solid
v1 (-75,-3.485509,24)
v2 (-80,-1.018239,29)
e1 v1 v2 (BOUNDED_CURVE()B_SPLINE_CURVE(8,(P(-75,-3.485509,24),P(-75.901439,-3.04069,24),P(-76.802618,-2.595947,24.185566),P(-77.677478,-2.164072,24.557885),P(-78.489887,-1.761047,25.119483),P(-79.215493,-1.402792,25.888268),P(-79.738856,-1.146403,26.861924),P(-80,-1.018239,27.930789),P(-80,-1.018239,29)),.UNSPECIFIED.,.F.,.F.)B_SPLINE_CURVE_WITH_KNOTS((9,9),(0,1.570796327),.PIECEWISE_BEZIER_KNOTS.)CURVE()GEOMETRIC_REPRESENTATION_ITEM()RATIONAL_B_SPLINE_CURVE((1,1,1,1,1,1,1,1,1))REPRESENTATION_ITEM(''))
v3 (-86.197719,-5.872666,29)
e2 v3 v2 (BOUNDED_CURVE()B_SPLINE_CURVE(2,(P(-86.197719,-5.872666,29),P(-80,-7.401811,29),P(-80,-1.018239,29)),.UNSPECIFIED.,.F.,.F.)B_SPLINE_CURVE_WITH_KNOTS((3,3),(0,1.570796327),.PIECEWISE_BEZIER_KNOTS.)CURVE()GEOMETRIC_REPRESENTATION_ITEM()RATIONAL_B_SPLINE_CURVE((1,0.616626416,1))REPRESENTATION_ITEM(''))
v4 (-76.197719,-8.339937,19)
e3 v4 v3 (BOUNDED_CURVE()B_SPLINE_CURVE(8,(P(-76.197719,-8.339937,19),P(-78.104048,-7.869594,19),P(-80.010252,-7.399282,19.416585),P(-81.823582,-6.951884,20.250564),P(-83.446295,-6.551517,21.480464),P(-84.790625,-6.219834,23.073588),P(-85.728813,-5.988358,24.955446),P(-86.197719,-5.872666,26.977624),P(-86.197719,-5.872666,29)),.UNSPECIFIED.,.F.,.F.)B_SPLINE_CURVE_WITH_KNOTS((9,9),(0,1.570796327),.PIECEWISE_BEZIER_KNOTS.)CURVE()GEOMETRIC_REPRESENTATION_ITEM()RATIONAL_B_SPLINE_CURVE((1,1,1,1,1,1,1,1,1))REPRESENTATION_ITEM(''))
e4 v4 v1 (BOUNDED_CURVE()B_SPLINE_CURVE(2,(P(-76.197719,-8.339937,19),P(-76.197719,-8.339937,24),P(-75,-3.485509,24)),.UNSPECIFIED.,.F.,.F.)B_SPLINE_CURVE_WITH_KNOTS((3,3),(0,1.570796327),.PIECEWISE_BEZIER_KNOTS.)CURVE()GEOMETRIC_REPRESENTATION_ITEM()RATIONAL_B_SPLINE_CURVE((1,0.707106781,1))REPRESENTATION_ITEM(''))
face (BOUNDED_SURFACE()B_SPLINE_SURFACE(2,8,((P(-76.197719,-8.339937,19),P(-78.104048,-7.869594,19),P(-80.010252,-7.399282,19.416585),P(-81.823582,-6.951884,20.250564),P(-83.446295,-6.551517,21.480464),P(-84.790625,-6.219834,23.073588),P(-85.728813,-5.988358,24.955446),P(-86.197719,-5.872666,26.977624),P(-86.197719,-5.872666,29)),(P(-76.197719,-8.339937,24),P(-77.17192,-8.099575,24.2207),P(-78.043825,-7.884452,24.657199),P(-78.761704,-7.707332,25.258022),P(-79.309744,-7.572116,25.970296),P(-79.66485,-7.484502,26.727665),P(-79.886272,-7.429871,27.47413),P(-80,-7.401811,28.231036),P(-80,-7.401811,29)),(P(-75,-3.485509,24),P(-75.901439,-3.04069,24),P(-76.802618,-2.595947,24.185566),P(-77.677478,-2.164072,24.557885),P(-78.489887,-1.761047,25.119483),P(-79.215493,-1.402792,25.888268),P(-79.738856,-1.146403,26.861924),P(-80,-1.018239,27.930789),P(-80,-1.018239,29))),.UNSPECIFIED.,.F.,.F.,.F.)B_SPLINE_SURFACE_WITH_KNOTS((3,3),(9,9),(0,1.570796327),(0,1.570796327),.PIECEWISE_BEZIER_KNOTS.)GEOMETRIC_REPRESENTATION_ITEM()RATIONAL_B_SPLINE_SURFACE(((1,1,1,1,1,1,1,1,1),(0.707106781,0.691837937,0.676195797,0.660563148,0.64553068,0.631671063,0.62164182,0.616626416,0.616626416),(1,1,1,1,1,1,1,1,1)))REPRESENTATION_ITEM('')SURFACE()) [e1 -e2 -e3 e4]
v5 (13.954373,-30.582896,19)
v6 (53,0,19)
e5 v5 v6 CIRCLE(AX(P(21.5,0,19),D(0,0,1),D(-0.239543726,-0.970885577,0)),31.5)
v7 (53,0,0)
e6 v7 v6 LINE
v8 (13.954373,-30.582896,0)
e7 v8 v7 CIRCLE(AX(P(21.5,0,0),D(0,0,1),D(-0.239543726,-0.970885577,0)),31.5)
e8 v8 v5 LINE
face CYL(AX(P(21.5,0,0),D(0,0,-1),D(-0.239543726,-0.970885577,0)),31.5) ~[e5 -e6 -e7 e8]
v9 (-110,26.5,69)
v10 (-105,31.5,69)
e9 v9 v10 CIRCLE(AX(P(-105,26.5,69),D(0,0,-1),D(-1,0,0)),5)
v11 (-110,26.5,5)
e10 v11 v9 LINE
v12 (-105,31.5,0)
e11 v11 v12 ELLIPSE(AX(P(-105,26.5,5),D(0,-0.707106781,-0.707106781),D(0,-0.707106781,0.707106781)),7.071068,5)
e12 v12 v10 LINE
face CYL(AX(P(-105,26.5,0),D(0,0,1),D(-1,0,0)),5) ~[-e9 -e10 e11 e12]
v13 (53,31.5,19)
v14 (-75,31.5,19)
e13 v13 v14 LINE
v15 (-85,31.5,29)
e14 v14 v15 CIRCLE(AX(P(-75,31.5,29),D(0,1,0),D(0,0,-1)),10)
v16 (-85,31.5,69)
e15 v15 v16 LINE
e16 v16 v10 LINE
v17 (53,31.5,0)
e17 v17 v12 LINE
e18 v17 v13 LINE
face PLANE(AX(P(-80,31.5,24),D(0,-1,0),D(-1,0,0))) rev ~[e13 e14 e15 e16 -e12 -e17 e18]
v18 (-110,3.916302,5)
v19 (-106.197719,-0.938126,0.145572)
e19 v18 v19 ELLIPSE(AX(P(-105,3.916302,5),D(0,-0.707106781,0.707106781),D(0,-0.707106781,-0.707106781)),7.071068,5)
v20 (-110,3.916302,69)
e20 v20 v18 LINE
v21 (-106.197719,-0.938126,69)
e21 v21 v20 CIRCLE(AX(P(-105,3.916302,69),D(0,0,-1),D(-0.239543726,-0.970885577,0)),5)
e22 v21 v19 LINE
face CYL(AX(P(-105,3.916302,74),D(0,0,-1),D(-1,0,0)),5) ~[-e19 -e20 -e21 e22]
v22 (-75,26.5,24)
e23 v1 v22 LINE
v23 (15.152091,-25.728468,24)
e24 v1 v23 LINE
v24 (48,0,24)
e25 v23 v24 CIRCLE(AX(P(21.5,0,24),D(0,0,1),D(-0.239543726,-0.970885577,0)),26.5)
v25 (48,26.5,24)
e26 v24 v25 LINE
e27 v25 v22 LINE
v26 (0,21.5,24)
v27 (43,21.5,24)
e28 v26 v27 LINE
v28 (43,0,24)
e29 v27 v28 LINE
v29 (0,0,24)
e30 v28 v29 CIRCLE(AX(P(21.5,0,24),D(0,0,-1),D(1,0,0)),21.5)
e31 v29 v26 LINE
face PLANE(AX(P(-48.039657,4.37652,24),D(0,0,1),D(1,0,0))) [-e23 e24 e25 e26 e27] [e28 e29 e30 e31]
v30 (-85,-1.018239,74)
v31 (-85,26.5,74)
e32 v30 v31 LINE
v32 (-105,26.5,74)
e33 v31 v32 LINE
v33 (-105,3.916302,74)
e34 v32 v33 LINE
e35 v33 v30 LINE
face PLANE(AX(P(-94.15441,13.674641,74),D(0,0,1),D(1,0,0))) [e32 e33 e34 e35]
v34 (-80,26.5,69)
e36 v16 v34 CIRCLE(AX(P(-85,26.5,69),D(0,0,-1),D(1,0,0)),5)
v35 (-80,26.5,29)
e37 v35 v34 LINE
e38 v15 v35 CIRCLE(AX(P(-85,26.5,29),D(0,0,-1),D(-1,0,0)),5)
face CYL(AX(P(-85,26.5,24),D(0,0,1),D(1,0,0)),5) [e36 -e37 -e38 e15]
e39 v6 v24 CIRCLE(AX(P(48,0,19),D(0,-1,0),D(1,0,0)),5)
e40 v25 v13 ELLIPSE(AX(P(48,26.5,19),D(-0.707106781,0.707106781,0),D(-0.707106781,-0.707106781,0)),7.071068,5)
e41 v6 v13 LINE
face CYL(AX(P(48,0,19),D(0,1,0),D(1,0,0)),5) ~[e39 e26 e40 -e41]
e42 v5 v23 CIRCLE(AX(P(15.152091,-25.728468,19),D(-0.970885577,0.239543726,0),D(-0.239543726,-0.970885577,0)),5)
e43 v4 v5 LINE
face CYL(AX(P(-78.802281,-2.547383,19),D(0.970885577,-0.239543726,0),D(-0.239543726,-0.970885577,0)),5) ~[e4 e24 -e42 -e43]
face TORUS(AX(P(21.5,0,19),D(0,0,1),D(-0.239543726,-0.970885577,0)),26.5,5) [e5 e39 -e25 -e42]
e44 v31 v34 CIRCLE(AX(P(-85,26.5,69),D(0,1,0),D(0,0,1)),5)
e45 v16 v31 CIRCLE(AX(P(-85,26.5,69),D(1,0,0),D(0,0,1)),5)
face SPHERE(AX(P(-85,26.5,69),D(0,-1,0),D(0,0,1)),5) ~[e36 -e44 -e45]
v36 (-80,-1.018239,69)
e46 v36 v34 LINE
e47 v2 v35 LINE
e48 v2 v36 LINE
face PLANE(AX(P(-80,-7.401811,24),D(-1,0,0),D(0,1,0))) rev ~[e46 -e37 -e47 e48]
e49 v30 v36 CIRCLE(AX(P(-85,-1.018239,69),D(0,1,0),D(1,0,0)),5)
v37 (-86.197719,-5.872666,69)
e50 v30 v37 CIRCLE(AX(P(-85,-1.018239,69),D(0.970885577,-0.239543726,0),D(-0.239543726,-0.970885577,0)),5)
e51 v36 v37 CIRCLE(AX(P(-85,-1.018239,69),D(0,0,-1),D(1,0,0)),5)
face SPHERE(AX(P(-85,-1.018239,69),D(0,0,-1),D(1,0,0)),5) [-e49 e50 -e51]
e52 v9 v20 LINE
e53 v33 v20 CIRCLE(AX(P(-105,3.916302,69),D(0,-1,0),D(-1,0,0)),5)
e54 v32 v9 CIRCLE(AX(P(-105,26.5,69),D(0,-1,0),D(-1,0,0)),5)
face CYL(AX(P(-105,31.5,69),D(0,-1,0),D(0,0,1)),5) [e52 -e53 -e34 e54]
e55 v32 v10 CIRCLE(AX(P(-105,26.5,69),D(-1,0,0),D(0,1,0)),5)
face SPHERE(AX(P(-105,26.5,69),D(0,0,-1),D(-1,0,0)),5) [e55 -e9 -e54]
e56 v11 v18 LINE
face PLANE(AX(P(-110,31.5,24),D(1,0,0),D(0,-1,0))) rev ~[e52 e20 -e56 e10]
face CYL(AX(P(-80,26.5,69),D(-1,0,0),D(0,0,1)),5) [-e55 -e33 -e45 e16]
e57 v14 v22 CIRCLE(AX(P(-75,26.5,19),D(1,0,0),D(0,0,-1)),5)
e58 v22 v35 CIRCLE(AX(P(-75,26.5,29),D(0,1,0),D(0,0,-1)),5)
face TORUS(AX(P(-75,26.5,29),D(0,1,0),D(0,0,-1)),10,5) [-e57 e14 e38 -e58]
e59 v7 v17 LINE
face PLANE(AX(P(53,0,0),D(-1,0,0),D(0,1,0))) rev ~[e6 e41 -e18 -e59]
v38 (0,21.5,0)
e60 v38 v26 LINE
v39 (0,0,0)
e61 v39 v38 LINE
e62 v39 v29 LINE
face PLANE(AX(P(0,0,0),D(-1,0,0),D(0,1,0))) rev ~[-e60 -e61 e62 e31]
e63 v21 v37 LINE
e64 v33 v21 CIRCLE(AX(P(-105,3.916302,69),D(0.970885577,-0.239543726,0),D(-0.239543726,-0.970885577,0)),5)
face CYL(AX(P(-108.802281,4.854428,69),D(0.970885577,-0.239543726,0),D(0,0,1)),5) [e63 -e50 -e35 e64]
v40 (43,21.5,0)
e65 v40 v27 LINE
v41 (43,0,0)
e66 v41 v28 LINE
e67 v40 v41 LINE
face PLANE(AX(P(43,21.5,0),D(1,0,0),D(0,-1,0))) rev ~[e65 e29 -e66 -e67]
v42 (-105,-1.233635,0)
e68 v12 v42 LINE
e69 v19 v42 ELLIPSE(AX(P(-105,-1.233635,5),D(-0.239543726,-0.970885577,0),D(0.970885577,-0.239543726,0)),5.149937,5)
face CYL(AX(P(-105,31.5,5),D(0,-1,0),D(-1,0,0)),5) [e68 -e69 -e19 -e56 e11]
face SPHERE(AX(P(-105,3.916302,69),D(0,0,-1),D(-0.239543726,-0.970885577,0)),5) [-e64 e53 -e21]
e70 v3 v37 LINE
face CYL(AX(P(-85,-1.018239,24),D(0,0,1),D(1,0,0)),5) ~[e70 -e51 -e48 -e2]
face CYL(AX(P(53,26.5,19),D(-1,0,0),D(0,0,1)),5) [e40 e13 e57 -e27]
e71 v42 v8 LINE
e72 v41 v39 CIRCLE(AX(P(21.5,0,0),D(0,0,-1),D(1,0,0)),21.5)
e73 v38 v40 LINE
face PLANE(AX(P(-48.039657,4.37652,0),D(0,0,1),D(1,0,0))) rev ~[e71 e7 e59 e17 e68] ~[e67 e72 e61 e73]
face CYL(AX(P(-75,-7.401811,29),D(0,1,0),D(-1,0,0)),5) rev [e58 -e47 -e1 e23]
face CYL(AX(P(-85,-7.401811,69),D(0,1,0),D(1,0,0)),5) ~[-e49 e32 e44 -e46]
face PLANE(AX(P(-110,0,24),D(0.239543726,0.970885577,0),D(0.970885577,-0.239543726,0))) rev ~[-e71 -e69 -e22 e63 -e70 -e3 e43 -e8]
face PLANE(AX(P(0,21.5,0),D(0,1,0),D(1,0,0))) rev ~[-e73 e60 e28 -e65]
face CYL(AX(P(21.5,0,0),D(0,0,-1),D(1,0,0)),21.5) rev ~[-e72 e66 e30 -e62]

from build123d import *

# Parameters (mm, degrees)
F1_DEPTH = 24
F3_DEPTH = 50
F4_R     = 5


with BuildPart() as f1:
    # F0 (on Top) → F1 (new body)
    with BuildSketch(Plane.XY):
        with BuildLine():
            Line((-10, 0), (-10, 31.5))
            Line((-10, 31.5), (-110, 31.5))
            Line((-110, 31.5), (-110, 0))
            Line((-110, 0), (13.9543726236, -30.5828956689))
            ThreePointArc((13.9543726236, -30.5828956689), (-3.2985610707, -19.4237321033), (-10, 0))
        make_face()
        with BuildLine():
            Line((53, 31.5), (-10, 31.5))
            Line((-10, 31.5), (-10, 0))
            ThreePointArc((-10, 0), (-3.2985610707, -19.4237321033), (13.9543726236, -30.5828956689))
            ThreePointArc((13.9543726236, -30.5828956689), (40.9237321033, -24.7985610707), (53, 0))
            Line((53, 0), (53, 31.5))
        make_face()
        with BuildLine():
            ThreePointArc((43, 0), (21.5, -21.5), (0, 0))
            Line((0, 0), (0, 21.5))
            Line((0, 21.5), (43, 21.5))
            Line((43, 21.5), (43, 0))
        make_face(mode=Mode.SUBTRACT)
    extrude(amount=F1_DEPTH)

    # F2 (on face) → F3 (join)
    with BuildSketch(Plane.XY.offset(24)):
        Polygon((-80, -7.4018112524), (-80, 31.5), (-110, 31.5), (-110, 0), align=None)
    extrude(amount=F3_DEPTH)

    # F4
    f4_edges = [f1.edges().sort_by_distance(p)[0] for p in [
        (-110, 31.5, 37),
        (-110, 15.75, 74),
        (-110, 0, 37),
        (-110, 15.75, 0),
        (-80, 12.049094, 74),
        (-95, 31.5, 74),
        (-95, -3.700906, 74),
        (-80, -7.401811, 49),
        (-80, 31.5, 49),
        (-80, 12.049094, 24),
        (-13.5, 31.5, 24),
        (53, 15.75, 24),
        (40.923732, -24.798561, 24),
        (-33.022814, -18.992353, 24),
    ]]
    fillet(f4_edges, radius=F4_R)


solid = f1.part
